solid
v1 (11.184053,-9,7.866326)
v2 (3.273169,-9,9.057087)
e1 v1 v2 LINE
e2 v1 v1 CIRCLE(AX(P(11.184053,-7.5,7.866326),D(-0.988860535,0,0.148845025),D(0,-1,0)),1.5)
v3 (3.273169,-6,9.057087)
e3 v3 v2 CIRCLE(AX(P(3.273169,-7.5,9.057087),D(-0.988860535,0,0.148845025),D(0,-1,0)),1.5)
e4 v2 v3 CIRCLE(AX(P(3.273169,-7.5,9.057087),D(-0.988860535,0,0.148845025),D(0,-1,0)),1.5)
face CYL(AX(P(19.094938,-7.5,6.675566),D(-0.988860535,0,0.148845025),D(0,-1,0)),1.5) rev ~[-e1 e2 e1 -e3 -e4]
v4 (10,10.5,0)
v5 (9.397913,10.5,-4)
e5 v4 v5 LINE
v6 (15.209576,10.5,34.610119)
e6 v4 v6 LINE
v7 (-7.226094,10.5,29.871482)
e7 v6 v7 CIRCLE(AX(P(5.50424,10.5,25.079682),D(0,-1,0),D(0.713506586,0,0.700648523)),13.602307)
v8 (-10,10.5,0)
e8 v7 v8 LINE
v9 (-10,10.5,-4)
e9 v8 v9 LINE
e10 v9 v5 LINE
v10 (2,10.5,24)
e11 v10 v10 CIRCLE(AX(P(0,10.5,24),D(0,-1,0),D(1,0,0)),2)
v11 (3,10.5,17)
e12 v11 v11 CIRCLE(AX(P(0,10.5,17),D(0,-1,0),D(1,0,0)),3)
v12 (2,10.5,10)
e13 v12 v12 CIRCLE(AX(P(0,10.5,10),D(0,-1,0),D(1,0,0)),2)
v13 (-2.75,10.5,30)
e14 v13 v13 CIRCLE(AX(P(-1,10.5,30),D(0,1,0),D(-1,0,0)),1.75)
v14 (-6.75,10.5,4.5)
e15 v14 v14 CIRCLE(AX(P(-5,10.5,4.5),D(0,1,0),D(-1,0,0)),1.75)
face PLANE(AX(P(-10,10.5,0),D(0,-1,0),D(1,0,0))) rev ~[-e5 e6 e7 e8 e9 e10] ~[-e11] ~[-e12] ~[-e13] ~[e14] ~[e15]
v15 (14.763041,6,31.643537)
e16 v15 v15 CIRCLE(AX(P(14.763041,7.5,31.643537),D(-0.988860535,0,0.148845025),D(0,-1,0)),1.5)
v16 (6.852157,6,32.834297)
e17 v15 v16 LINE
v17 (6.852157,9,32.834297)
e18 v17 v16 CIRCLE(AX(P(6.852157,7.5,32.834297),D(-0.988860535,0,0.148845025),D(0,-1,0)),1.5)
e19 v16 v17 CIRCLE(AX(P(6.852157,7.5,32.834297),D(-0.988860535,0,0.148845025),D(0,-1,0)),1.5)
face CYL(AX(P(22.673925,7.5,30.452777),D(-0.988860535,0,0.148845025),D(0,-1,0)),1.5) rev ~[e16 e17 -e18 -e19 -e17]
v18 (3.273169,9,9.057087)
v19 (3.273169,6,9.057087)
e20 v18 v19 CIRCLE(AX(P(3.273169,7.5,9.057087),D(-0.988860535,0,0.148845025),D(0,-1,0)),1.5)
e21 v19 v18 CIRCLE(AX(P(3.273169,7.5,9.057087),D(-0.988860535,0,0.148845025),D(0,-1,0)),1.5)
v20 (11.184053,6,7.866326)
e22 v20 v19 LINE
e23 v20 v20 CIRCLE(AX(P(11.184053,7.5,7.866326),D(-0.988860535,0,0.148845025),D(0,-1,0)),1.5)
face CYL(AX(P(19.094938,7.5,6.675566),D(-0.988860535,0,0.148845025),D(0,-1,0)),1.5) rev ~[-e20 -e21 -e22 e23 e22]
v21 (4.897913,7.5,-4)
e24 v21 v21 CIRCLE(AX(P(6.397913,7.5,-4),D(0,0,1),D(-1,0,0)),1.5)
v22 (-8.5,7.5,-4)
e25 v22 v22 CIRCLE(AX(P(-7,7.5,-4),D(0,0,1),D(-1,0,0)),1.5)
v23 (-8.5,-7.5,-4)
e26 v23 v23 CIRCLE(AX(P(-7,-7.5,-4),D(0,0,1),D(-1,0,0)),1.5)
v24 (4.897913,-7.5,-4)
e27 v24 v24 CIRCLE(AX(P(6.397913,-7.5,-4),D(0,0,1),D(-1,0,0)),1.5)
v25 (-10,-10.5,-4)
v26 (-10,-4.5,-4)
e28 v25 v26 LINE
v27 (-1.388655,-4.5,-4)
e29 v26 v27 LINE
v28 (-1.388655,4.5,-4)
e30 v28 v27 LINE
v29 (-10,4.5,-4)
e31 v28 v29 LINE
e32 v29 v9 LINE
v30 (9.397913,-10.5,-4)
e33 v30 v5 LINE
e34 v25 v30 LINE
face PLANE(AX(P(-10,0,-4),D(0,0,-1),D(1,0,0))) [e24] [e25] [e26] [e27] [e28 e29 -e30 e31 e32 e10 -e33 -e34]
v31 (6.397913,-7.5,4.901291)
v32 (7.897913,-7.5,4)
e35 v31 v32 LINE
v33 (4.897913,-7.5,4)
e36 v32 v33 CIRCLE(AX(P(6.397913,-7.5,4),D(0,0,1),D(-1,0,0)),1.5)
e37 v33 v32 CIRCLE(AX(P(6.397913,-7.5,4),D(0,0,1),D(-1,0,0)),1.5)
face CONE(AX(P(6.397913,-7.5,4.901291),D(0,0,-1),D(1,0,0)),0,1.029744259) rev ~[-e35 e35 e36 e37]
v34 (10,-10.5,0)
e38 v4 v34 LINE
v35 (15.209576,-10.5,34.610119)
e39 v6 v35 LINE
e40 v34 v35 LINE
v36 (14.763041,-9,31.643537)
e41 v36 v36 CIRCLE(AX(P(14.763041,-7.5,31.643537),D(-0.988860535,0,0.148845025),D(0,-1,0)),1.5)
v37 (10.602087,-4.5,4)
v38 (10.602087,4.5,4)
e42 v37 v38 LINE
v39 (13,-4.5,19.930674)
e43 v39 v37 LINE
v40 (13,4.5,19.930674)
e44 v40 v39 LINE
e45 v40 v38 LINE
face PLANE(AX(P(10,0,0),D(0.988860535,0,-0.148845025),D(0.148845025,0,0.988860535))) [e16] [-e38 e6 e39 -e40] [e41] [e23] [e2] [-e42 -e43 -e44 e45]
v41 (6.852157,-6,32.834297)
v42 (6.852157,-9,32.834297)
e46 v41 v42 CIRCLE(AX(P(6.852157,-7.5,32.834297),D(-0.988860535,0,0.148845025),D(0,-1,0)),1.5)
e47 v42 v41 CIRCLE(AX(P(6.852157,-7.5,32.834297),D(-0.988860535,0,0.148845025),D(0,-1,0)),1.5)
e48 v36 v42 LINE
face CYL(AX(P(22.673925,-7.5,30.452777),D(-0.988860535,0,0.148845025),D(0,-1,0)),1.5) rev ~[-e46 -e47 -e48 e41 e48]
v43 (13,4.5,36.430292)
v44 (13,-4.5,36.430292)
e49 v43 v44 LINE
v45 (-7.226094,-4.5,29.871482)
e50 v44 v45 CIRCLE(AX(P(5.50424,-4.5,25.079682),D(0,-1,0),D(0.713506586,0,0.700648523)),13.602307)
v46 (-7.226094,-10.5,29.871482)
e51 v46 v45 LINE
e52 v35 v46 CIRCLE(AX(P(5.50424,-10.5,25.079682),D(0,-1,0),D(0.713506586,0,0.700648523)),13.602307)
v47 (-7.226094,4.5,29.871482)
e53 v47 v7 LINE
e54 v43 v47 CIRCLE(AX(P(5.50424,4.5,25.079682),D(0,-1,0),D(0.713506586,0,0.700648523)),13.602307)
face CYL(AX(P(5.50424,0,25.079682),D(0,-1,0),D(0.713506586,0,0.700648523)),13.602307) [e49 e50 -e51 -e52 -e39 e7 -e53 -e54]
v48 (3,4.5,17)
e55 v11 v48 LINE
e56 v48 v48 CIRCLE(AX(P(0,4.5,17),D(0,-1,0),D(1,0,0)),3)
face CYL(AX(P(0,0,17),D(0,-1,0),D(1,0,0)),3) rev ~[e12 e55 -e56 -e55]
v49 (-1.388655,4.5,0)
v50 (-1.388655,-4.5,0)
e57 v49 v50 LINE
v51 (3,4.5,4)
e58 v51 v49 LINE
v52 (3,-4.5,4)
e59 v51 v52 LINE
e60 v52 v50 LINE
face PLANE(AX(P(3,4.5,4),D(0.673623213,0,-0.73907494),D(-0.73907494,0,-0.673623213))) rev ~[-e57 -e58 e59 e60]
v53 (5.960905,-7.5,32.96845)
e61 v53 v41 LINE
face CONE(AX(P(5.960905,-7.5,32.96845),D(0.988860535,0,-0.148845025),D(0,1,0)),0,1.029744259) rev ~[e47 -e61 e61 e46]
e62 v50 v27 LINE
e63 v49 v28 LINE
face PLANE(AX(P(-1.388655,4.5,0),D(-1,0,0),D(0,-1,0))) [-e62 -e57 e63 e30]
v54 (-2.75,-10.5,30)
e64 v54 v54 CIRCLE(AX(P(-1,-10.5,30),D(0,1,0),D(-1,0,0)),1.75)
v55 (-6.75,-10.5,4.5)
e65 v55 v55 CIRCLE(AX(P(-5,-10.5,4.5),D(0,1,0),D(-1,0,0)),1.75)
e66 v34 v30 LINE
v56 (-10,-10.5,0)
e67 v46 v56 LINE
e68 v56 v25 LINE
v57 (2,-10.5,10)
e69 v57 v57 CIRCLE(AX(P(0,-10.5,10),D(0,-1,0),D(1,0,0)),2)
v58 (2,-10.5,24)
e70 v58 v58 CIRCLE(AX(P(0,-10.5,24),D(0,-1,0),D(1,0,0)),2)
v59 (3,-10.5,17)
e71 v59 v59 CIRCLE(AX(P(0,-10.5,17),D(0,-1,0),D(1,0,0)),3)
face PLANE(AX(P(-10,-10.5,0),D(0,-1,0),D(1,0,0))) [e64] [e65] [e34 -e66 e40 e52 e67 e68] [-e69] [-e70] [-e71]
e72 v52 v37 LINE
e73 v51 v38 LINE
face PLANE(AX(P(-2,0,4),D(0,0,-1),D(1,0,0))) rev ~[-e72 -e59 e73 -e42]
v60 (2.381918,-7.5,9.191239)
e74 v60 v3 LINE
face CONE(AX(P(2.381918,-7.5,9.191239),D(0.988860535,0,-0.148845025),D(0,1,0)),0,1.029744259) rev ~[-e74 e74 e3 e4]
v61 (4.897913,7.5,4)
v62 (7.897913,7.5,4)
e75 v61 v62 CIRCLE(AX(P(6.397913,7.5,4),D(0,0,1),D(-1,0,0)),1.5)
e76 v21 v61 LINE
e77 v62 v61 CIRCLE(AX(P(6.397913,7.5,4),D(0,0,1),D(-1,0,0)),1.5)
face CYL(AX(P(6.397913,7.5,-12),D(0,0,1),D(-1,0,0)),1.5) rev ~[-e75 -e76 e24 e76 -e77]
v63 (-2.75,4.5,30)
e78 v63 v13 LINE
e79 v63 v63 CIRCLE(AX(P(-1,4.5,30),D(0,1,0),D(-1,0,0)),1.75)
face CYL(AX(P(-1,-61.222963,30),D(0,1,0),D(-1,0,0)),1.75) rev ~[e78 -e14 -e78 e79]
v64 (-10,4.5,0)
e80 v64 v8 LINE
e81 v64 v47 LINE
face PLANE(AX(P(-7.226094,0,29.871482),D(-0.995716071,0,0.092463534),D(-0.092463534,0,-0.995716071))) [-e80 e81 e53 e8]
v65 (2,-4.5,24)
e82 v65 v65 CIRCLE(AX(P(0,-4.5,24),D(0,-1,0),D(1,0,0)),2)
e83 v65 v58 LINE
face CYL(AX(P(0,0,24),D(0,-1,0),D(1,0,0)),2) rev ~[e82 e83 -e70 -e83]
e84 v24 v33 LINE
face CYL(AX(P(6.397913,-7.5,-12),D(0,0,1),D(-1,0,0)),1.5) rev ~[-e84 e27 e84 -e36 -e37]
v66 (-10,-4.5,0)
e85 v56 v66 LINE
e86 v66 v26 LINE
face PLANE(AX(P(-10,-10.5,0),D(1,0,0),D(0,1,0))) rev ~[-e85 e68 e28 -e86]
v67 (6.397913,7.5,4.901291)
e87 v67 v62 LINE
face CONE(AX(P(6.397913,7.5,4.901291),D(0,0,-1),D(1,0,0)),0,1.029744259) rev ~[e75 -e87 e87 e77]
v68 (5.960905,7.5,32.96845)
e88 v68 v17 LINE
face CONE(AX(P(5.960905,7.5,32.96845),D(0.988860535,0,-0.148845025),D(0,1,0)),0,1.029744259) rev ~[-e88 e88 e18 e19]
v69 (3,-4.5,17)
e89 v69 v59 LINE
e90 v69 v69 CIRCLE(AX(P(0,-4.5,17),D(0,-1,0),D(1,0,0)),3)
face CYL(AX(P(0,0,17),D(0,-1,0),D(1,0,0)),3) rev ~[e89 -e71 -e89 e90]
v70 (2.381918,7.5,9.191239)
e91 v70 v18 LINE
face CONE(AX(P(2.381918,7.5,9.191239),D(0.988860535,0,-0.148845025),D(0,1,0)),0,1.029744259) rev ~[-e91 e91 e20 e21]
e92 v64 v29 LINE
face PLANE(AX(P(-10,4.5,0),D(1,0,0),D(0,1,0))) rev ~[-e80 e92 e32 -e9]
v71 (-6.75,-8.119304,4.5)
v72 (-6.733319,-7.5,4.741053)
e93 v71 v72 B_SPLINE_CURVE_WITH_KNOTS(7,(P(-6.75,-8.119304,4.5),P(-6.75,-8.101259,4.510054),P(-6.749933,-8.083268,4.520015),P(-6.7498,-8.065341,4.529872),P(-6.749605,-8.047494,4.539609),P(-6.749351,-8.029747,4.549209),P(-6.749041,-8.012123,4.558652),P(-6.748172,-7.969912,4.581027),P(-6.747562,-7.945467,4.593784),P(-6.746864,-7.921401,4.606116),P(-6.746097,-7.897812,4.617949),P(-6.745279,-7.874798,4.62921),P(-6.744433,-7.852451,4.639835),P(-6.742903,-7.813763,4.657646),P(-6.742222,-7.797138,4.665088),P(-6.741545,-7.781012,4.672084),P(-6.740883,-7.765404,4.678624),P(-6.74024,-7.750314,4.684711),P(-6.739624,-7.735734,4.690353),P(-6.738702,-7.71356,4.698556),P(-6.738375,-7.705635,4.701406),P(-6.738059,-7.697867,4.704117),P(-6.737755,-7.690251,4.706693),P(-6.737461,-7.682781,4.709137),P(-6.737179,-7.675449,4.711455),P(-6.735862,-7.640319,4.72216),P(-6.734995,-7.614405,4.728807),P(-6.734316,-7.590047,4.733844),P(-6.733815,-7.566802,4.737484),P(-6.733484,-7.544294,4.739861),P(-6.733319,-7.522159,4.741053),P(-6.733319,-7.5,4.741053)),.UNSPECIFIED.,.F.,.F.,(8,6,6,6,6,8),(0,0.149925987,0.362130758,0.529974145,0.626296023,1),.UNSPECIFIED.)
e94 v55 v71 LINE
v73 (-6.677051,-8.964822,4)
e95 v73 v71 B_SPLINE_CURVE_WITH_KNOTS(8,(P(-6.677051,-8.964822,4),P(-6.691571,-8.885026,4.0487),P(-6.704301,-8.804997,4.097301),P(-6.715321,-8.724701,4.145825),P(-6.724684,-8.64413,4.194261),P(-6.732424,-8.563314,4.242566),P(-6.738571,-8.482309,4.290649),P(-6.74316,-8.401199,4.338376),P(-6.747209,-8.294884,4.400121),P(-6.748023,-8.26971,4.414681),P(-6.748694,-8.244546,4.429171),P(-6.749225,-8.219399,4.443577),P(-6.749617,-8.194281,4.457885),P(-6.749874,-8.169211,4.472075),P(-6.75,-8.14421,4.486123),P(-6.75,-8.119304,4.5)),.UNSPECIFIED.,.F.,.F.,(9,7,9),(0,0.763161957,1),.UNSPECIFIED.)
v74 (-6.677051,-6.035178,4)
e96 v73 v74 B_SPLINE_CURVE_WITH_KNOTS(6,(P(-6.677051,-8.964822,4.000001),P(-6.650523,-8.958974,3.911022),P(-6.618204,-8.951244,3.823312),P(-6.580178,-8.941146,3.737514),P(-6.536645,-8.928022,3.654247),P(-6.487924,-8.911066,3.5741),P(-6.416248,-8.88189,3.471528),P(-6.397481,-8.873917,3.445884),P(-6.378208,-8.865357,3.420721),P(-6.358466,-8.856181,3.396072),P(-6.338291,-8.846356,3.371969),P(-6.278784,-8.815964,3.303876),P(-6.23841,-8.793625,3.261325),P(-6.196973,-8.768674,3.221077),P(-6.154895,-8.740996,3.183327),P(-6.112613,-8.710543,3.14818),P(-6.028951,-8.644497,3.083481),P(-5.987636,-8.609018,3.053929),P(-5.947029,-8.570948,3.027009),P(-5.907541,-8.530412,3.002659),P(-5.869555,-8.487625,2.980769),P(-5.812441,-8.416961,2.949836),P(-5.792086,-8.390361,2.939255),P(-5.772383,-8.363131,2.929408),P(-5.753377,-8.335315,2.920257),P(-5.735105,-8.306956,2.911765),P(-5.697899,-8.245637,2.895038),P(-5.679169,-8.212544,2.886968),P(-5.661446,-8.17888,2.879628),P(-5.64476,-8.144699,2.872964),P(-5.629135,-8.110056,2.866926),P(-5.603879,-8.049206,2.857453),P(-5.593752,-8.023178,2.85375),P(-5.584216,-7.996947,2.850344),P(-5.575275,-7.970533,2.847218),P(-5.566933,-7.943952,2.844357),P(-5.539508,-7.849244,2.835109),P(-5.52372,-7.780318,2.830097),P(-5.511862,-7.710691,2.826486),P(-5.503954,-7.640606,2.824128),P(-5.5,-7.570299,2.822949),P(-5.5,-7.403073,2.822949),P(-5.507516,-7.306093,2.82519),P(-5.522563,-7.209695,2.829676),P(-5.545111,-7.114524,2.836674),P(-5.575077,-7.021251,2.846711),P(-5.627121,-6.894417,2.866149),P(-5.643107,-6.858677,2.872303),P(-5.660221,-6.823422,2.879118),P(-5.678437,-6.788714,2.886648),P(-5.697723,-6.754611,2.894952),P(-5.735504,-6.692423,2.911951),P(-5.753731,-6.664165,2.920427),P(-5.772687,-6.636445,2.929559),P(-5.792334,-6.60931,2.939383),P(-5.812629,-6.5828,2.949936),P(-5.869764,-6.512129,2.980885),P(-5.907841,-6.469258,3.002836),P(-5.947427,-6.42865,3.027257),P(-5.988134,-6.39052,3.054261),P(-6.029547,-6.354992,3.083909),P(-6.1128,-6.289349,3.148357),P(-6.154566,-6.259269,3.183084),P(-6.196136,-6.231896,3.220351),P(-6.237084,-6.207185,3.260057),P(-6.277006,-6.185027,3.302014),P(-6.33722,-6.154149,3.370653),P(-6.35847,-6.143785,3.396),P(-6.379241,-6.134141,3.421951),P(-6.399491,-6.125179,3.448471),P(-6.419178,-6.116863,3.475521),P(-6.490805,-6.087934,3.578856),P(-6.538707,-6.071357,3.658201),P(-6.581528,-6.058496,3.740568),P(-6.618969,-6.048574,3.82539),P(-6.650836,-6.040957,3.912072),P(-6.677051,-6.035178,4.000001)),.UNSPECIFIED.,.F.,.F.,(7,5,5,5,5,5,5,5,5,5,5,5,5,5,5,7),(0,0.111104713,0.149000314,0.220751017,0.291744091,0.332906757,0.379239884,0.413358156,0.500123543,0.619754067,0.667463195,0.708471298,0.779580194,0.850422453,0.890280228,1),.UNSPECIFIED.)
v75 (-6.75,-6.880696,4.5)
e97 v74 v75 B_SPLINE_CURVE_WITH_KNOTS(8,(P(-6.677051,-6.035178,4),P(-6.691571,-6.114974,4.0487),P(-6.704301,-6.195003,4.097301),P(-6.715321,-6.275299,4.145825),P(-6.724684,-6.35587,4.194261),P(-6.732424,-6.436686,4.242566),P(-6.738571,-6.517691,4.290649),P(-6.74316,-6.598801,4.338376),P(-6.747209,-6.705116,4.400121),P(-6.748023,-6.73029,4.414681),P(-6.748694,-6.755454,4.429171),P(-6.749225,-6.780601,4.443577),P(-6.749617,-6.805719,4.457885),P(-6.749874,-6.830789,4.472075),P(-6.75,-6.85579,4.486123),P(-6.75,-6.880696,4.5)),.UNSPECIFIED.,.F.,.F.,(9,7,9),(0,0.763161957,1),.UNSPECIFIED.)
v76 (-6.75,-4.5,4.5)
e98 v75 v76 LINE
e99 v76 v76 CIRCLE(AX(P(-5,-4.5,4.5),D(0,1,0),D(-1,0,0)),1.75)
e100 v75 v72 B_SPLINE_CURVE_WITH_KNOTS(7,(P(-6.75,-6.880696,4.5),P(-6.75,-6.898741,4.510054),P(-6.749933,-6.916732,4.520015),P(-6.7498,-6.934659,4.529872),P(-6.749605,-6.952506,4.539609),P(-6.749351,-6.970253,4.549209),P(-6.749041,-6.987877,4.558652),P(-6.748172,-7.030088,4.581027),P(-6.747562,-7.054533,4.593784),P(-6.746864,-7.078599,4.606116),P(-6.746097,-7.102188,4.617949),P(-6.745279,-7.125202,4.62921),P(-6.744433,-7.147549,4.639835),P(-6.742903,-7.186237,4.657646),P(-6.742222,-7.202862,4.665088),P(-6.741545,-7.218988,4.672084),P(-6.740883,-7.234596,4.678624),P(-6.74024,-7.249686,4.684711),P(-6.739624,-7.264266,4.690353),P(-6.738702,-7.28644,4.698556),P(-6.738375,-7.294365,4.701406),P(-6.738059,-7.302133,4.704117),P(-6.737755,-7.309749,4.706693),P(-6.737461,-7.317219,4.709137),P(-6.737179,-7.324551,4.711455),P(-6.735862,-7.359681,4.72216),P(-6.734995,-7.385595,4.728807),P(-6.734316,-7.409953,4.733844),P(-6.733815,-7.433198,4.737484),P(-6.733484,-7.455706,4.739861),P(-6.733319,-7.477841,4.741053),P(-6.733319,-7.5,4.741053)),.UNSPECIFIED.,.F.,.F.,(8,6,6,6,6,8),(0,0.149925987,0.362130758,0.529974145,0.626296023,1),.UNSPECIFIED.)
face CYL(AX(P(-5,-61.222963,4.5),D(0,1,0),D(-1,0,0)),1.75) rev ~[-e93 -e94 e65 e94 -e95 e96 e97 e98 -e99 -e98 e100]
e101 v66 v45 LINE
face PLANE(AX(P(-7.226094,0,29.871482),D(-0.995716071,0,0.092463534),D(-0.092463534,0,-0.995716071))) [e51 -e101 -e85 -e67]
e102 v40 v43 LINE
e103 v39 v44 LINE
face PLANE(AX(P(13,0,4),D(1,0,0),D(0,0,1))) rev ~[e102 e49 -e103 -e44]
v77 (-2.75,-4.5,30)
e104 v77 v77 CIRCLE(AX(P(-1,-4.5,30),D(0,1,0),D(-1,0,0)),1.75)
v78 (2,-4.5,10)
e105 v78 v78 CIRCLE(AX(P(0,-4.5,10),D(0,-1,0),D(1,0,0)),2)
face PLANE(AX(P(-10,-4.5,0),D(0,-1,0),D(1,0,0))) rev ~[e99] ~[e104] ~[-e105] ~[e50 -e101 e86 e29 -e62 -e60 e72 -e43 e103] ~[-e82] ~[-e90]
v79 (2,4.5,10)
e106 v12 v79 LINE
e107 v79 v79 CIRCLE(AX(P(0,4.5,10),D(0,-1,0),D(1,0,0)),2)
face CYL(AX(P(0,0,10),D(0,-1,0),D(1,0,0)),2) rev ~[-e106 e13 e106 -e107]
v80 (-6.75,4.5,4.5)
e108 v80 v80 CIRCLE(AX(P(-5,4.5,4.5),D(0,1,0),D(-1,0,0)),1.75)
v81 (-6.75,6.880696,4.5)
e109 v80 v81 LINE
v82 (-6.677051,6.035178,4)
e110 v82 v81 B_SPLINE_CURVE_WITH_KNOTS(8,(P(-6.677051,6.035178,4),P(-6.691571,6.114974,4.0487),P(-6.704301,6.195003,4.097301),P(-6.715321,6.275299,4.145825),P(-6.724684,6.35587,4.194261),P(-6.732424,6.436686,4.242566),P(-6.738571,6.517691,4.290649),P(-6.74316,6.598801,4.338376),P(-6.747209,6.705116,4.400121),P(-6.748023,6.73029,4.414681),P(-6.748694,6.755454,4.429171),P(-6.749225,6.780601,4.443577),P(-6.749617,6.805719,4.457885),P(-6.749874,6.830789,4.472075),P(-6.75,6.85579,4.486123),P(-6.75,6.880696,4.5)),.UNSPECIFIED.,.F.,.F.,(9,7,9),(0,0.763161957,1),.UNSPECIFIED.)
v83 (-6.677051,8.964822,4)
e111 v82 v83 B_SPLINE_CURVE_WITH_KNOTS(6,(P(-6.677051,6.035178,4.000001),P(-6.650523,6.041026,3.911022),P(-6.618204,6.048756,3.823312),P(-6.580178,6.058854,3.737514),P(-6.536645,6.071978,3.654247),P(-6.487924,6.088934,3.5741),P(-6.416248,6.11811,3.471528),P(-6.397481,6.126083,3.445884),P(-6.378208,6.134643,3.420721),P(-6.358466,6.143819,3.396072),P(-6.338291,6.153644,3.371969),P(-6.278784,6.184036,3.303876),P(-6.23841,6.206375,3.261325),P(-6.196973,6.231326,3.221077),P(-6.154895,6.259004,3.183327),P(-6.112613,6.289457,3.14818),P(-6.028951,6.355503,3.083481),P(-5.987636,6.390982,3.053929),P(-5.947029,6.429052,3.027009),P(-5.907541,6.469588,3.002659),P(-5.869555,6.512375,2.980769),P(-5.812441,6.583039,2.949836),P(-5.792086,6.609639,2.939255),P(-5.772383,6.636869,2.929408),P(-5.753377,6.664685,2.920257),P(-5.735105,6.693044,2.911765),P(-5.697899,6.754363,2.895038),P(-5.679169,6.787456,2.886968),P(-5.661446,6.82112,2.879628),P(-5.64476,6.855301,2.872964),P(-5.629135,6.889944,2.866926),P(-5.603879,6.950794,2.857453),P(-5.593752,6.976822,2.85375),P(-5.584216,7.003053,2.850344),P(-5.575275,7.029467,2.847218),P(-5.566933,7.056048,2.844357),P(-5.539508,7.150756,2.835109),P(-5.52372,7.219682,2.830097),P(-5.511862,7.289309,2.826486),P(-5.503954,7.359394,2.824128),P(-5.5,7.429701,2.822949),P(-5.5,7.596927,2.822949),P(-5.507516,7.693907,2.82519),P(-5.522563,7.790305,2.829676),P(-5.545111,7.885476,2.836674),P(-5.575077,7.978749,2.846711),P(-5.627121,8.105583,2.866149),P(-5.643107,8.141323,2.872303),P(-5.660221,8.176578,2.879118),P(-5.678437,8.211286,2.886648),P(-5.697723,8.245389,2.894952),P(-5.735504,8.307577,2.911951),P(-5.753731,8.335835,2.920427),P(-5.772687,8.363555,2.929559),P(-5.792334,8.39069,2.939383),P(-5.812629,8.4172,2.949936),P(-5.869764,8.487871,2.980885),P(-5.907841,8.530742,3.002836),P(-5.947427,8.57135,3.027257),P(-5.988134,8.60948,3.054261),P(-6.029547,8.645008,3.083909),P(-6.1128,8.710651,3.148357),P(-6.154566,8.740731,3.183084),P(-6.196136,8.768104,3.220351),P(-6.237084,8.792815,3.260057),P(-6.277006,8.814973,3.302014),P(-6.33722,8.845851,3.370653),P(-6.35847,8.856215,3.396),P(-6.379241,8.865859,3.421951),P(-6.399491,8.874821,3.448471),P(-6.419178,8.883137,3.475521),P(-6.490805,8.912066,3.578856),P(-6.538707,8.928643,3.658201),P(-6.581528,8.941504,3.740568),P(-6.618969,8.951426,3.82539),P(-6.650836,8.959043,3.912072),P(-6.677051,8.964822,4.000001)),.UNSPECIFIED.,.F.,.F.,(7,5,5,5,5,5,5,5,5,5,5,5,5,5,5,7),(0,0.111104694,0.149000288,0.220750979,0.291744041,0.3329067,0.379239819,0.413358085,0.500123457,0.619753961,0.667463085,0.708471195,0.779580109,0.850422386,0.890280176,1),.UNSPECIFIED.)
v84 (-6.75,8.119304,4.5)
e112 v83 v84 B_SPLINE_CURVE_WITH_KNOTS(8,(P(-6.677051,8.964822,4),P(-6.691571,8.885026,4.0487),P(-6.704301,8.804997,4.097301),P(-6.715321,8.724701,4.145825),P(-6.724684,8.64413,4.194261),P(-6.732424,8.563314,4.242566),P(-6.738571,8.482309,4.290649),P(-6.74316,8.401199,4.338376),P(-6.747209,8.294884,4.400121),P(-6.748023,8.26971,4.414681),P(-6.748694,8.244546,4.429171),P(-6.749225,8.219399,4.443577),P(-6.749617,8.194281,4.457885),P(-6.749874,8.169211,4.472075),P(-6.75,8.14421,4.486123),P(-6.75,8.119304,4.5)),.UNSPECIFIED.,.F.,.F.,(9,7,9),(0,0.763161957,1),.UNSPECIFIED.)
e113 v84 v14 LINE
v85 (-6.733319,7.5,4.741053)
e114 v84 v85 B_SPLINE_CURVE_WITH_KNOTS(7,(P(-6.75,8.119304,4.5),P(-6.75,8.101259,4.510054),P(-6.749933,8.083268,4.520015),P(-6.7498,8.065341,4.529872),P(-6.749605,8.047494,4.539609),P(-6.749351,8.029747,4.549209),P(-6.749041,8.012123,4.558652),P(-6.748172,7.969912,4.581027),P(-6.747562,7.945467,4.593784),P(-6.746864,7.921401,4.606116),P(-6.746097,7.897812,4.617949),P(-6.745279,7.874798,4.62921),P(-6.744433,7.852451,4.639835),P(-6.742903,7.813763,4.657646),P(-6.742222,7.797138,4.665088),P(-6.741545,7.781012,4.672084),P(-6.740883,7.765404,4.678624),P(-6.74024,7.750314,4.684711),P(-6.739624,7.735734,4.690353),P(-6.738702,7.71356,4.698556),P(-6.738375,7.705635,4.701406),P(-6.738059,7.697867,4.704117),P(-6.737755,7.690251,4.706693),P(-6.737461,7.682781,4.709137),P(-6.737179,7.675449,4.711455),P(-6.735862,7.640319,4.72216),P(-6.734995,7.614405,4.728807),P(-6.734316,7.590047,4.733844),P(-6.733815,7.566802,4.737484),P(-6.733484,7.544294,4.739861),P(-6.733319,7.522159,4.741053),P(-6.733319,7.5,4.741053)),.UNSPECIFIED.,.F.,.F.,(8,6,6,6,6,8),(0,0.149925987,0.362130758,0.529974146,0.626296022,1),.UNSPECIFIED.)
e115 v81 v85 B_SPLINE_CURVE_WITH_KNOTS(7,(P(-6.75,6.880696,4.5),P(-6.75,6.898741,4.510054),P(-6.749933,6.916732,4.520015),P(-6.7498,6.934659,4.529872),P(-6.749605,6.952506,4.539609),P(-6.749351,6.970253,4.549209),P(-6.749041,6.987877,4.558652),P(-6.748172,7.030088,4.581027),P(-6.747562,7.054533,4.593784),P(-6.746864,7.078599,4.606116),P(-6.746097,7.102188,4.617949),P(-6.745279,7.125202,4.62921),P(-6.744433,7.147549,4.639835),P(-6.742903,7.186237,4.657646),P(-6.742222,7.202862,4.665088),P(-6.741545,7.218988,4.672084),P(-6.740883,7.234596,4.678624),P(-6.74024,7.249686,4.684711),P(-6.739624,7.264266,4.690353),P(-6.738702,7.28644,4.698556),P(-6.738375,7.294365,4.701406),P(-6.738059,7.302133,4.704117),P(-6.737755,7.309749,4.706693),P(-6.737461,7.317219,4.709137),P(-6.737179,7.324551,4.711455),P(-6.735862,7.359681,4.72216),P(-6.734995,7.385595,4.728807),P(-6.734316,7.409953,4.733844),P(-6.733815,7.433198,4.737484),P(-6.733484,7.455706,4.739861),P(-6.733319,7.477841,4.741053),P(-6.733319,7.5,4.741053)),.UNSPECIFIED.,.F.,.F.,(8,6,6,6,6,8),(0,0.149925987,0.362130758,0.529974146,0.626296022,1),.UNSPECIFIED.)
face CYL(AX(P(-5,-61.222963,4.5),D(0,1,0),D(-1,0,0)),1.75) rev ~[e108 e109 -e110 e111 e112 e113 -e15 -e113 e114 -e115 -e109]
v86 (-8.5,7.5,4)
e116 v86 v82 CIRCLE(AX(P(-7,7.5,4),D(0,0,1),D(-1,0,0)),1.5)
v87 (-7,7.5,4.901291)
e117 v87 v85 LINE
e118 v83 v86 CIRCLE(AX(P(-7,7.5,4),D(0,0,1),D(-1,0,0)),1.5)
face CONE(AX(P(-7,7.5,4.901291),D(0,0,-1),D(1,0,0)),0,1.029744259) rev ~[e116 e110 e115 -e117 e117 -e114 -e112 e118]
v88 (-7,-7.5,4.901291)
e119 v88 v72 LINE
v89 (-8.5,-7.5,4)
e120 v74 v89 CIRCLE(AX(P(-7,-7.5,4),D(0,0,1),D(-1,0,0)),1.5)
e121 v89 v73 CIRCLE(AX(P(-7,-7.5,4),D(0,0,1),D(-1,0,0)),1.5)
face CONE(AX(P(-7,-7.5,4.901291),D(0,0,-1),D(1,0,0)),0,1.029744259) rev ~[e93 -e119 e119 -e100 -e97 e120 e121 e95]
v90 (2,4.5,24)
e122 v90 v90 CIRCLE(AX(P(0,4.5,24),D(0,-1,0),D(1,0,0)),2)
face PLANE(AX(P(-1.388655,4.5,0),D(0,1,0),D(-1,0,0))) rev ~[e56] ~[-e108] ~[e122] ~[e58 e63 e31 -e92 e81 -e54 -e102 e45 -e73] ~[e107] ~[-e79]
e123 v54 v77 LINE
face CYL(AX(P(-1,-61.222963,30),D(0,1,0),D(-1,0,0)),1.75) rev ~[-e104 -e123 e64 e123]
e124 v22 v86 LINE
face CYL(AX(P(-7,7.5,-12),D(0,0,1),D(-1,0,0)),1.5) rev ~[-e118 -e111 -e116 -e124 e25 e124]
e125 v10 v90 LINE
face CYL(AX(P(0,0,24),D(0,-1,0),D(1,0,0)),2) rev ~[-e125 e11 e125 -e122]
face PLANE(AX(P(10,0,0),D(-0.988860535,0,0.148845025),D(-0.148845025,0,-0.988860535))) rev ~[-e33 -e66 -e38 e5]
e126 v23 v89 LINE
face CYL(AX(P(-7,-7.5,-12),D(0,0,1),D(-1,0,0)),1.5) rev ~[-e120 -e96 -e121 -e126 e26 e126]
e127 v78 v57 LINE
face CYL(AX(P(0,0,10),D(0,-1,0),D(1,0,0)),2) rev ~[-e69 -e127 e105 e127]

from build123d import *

# Parameters (mm, degrees)
F1_DEPTH    = 10.5
F3_DEPTH    = 4.5
F6_D        = 3.5
F7_T1_DEPTH = 9
F8_R        = 2
F9_DEPTH    = 12.5
F8_R_2      = 3
F11_DEPTH   = 4
F13_DEPTH   = 20
F16_D       = 3
F16_DEPTH   = 8
F16_TIP     = 0.9012909285
F18_D       = 3
F18_DEPTH   = 8
F18_TIP     = 0.9012909285


# Not quite as in the source:
# - a fillet or chamfer that OpenCascade refuses, or shapes differently, is made with other operations: its cross-section is extruded or revolved along the edge and cut away or added


with BuildPart() as f1:
    # F0 (on Front) → F1 (new body, symmetric)
    with BuildSketch(Plane.XZ):
        with BuildLine():
            Line((-10, 0), (10, 0))
            Line((10, 0), (15.209575871, 34.6101187407))
            ThreePointArc((15.209575871, 34.6101187407), (2.6933109979, 38.3883800382), (-7.2260939759, 29.8714821422))
            Line((-7.2260939759, 29.8714821422), (-10, 0))
        make_face()
    extrude(amount=F1_DEPTH, both=True)


with BuildPart() as f3:
    # F2 (on Front) → F3 (new body, symmetric)
    with BuildSketch(Plane.XZ):
        Polygon((-2, 4), (13, 4), (13, 39), (-15, 39), (-15, 0), (-2.371445382, 0), align=None)
    extrude(amount=F3_DEPTH, both=True)


with BuildPart() as f1_1:
    add(f1.part)

    # F4: cut F3
    add(f3.part, mode=Mode.SUBTRACT)

    # F6 (through all)
    with Locations(Plane.XZ.offset(10.5)):
        with Locations((-1, 30), (-5, 4.5)):
            Hole(F6_D / 2)

    # F7: chamfer of 5 on 1 edges, made by hand

    # F7_s2 → F7_t1 (cut)
    with BuildSketch(Plane.XZ.offset(-4.5)):
        Polygon((3, 4), (-2.4623176707, -0.978580357), (-2, 4), align=None)
    extrude(amount=F7_T1_DEPTH, mode=Mode.SUBTRACT)


with BuildPart() as f9:
    # F8 (on Front) → F9 (new body, symmetric)
    with BuildSketch(Plane.XZ):
        with Locations((0, 24)):
            Circle(F8_R)
    extrude(amount=F9_DEPTH, both=True)


with BuildPart() as f9b:
    # F8 (on Front) → F9, piece 2 (new body, symmetric)
    with BuildSketch(Plane.XZ):
        with Locations((0, 17)):
            Circle(F8_R_2)
    extrude(amount=F9_DEPTH, both=True)


with BuildPart() as f9c:
    # F8 (on Front) → F9, piece 3 (new body, symmetric)
    with BuildSketch(Plane.XZ):
        with Locations((0, 10)):
            Circle(F8_R)
    extrude(amount=F9_DEPTH, both=True)


with BuildPart() as f1_2:
    add(f1_1.part)

    # F10: cut F9c, F9b, F9
    add(f9c.part, mode=Mode.SUBTRACT)
    add(f9b.part, mode=Mode.SUBTRACT)
    add(f9.part, mode=Mode.SUBTRACT)

    # F11 (add): a face of the model
    f11_faces = [f1_2.faces().sort_by_distance(p)[0] for p in [
        (1.2885403927, 0, 0),
    ]]
    extrude(f11_faces, amount=F11_DEPTH)


with BuildPart() as f13:
    # F12 (on Front) → F13 (new body, symmetric)
    with BuildSketch(Plane.XZ):
        Polygon((10, -10), (10, 0), (8.4947824334, -10), align=None)
    extrude(amount=F13_DEPTH, both=True)


with BuildPart() as f1_3:
    add(f1_2.part)

    # F14: cut F13
    add(f13.part, mode=Mode.SUBTRACT)

    # F16
    with Locations(Plane(origin=(0, 0, -4), x_dir=(1, 0, 0), z_dir=(0, 0, -1))):
        with Locations((-7, 7.5), (6.3979129734, 7.5), (6.3979129734, -7.5), (-7, -7.5)):
            Hole(F16_D / 2, depth=F16_DEPTH)
            with Locations((0, 0, -(F16_DEPTH + F16_TIP / 2))):  # 118° drill point
                Cone(0, F16_D / 2, F16_TIP, mode=Mode.SUBTRACT)

    # F18
    with Locations(Plane(origin=(9.7784515857, 0, -1.4718697101), x_dir=(0, 1, 0), z_dir=(0.9888605354, 0, -0.1488450249))):
        with Locations((-7.5, 33.4884502488), (7.5, 33.4884502488), (-7.5, 9.4433904486), (7.5, 9.4433904486)):
            Hole(F18_D / 2, depth=F18_DEPTH)
            with Locations((0, 0, -(F18_DEPTH + F18_TIP / 2))):  # 118° drill point
                Cone(0, F18_D / 2, F18_TIP, mode=Mode.SUBTRACT)


solid = f1_3.part
